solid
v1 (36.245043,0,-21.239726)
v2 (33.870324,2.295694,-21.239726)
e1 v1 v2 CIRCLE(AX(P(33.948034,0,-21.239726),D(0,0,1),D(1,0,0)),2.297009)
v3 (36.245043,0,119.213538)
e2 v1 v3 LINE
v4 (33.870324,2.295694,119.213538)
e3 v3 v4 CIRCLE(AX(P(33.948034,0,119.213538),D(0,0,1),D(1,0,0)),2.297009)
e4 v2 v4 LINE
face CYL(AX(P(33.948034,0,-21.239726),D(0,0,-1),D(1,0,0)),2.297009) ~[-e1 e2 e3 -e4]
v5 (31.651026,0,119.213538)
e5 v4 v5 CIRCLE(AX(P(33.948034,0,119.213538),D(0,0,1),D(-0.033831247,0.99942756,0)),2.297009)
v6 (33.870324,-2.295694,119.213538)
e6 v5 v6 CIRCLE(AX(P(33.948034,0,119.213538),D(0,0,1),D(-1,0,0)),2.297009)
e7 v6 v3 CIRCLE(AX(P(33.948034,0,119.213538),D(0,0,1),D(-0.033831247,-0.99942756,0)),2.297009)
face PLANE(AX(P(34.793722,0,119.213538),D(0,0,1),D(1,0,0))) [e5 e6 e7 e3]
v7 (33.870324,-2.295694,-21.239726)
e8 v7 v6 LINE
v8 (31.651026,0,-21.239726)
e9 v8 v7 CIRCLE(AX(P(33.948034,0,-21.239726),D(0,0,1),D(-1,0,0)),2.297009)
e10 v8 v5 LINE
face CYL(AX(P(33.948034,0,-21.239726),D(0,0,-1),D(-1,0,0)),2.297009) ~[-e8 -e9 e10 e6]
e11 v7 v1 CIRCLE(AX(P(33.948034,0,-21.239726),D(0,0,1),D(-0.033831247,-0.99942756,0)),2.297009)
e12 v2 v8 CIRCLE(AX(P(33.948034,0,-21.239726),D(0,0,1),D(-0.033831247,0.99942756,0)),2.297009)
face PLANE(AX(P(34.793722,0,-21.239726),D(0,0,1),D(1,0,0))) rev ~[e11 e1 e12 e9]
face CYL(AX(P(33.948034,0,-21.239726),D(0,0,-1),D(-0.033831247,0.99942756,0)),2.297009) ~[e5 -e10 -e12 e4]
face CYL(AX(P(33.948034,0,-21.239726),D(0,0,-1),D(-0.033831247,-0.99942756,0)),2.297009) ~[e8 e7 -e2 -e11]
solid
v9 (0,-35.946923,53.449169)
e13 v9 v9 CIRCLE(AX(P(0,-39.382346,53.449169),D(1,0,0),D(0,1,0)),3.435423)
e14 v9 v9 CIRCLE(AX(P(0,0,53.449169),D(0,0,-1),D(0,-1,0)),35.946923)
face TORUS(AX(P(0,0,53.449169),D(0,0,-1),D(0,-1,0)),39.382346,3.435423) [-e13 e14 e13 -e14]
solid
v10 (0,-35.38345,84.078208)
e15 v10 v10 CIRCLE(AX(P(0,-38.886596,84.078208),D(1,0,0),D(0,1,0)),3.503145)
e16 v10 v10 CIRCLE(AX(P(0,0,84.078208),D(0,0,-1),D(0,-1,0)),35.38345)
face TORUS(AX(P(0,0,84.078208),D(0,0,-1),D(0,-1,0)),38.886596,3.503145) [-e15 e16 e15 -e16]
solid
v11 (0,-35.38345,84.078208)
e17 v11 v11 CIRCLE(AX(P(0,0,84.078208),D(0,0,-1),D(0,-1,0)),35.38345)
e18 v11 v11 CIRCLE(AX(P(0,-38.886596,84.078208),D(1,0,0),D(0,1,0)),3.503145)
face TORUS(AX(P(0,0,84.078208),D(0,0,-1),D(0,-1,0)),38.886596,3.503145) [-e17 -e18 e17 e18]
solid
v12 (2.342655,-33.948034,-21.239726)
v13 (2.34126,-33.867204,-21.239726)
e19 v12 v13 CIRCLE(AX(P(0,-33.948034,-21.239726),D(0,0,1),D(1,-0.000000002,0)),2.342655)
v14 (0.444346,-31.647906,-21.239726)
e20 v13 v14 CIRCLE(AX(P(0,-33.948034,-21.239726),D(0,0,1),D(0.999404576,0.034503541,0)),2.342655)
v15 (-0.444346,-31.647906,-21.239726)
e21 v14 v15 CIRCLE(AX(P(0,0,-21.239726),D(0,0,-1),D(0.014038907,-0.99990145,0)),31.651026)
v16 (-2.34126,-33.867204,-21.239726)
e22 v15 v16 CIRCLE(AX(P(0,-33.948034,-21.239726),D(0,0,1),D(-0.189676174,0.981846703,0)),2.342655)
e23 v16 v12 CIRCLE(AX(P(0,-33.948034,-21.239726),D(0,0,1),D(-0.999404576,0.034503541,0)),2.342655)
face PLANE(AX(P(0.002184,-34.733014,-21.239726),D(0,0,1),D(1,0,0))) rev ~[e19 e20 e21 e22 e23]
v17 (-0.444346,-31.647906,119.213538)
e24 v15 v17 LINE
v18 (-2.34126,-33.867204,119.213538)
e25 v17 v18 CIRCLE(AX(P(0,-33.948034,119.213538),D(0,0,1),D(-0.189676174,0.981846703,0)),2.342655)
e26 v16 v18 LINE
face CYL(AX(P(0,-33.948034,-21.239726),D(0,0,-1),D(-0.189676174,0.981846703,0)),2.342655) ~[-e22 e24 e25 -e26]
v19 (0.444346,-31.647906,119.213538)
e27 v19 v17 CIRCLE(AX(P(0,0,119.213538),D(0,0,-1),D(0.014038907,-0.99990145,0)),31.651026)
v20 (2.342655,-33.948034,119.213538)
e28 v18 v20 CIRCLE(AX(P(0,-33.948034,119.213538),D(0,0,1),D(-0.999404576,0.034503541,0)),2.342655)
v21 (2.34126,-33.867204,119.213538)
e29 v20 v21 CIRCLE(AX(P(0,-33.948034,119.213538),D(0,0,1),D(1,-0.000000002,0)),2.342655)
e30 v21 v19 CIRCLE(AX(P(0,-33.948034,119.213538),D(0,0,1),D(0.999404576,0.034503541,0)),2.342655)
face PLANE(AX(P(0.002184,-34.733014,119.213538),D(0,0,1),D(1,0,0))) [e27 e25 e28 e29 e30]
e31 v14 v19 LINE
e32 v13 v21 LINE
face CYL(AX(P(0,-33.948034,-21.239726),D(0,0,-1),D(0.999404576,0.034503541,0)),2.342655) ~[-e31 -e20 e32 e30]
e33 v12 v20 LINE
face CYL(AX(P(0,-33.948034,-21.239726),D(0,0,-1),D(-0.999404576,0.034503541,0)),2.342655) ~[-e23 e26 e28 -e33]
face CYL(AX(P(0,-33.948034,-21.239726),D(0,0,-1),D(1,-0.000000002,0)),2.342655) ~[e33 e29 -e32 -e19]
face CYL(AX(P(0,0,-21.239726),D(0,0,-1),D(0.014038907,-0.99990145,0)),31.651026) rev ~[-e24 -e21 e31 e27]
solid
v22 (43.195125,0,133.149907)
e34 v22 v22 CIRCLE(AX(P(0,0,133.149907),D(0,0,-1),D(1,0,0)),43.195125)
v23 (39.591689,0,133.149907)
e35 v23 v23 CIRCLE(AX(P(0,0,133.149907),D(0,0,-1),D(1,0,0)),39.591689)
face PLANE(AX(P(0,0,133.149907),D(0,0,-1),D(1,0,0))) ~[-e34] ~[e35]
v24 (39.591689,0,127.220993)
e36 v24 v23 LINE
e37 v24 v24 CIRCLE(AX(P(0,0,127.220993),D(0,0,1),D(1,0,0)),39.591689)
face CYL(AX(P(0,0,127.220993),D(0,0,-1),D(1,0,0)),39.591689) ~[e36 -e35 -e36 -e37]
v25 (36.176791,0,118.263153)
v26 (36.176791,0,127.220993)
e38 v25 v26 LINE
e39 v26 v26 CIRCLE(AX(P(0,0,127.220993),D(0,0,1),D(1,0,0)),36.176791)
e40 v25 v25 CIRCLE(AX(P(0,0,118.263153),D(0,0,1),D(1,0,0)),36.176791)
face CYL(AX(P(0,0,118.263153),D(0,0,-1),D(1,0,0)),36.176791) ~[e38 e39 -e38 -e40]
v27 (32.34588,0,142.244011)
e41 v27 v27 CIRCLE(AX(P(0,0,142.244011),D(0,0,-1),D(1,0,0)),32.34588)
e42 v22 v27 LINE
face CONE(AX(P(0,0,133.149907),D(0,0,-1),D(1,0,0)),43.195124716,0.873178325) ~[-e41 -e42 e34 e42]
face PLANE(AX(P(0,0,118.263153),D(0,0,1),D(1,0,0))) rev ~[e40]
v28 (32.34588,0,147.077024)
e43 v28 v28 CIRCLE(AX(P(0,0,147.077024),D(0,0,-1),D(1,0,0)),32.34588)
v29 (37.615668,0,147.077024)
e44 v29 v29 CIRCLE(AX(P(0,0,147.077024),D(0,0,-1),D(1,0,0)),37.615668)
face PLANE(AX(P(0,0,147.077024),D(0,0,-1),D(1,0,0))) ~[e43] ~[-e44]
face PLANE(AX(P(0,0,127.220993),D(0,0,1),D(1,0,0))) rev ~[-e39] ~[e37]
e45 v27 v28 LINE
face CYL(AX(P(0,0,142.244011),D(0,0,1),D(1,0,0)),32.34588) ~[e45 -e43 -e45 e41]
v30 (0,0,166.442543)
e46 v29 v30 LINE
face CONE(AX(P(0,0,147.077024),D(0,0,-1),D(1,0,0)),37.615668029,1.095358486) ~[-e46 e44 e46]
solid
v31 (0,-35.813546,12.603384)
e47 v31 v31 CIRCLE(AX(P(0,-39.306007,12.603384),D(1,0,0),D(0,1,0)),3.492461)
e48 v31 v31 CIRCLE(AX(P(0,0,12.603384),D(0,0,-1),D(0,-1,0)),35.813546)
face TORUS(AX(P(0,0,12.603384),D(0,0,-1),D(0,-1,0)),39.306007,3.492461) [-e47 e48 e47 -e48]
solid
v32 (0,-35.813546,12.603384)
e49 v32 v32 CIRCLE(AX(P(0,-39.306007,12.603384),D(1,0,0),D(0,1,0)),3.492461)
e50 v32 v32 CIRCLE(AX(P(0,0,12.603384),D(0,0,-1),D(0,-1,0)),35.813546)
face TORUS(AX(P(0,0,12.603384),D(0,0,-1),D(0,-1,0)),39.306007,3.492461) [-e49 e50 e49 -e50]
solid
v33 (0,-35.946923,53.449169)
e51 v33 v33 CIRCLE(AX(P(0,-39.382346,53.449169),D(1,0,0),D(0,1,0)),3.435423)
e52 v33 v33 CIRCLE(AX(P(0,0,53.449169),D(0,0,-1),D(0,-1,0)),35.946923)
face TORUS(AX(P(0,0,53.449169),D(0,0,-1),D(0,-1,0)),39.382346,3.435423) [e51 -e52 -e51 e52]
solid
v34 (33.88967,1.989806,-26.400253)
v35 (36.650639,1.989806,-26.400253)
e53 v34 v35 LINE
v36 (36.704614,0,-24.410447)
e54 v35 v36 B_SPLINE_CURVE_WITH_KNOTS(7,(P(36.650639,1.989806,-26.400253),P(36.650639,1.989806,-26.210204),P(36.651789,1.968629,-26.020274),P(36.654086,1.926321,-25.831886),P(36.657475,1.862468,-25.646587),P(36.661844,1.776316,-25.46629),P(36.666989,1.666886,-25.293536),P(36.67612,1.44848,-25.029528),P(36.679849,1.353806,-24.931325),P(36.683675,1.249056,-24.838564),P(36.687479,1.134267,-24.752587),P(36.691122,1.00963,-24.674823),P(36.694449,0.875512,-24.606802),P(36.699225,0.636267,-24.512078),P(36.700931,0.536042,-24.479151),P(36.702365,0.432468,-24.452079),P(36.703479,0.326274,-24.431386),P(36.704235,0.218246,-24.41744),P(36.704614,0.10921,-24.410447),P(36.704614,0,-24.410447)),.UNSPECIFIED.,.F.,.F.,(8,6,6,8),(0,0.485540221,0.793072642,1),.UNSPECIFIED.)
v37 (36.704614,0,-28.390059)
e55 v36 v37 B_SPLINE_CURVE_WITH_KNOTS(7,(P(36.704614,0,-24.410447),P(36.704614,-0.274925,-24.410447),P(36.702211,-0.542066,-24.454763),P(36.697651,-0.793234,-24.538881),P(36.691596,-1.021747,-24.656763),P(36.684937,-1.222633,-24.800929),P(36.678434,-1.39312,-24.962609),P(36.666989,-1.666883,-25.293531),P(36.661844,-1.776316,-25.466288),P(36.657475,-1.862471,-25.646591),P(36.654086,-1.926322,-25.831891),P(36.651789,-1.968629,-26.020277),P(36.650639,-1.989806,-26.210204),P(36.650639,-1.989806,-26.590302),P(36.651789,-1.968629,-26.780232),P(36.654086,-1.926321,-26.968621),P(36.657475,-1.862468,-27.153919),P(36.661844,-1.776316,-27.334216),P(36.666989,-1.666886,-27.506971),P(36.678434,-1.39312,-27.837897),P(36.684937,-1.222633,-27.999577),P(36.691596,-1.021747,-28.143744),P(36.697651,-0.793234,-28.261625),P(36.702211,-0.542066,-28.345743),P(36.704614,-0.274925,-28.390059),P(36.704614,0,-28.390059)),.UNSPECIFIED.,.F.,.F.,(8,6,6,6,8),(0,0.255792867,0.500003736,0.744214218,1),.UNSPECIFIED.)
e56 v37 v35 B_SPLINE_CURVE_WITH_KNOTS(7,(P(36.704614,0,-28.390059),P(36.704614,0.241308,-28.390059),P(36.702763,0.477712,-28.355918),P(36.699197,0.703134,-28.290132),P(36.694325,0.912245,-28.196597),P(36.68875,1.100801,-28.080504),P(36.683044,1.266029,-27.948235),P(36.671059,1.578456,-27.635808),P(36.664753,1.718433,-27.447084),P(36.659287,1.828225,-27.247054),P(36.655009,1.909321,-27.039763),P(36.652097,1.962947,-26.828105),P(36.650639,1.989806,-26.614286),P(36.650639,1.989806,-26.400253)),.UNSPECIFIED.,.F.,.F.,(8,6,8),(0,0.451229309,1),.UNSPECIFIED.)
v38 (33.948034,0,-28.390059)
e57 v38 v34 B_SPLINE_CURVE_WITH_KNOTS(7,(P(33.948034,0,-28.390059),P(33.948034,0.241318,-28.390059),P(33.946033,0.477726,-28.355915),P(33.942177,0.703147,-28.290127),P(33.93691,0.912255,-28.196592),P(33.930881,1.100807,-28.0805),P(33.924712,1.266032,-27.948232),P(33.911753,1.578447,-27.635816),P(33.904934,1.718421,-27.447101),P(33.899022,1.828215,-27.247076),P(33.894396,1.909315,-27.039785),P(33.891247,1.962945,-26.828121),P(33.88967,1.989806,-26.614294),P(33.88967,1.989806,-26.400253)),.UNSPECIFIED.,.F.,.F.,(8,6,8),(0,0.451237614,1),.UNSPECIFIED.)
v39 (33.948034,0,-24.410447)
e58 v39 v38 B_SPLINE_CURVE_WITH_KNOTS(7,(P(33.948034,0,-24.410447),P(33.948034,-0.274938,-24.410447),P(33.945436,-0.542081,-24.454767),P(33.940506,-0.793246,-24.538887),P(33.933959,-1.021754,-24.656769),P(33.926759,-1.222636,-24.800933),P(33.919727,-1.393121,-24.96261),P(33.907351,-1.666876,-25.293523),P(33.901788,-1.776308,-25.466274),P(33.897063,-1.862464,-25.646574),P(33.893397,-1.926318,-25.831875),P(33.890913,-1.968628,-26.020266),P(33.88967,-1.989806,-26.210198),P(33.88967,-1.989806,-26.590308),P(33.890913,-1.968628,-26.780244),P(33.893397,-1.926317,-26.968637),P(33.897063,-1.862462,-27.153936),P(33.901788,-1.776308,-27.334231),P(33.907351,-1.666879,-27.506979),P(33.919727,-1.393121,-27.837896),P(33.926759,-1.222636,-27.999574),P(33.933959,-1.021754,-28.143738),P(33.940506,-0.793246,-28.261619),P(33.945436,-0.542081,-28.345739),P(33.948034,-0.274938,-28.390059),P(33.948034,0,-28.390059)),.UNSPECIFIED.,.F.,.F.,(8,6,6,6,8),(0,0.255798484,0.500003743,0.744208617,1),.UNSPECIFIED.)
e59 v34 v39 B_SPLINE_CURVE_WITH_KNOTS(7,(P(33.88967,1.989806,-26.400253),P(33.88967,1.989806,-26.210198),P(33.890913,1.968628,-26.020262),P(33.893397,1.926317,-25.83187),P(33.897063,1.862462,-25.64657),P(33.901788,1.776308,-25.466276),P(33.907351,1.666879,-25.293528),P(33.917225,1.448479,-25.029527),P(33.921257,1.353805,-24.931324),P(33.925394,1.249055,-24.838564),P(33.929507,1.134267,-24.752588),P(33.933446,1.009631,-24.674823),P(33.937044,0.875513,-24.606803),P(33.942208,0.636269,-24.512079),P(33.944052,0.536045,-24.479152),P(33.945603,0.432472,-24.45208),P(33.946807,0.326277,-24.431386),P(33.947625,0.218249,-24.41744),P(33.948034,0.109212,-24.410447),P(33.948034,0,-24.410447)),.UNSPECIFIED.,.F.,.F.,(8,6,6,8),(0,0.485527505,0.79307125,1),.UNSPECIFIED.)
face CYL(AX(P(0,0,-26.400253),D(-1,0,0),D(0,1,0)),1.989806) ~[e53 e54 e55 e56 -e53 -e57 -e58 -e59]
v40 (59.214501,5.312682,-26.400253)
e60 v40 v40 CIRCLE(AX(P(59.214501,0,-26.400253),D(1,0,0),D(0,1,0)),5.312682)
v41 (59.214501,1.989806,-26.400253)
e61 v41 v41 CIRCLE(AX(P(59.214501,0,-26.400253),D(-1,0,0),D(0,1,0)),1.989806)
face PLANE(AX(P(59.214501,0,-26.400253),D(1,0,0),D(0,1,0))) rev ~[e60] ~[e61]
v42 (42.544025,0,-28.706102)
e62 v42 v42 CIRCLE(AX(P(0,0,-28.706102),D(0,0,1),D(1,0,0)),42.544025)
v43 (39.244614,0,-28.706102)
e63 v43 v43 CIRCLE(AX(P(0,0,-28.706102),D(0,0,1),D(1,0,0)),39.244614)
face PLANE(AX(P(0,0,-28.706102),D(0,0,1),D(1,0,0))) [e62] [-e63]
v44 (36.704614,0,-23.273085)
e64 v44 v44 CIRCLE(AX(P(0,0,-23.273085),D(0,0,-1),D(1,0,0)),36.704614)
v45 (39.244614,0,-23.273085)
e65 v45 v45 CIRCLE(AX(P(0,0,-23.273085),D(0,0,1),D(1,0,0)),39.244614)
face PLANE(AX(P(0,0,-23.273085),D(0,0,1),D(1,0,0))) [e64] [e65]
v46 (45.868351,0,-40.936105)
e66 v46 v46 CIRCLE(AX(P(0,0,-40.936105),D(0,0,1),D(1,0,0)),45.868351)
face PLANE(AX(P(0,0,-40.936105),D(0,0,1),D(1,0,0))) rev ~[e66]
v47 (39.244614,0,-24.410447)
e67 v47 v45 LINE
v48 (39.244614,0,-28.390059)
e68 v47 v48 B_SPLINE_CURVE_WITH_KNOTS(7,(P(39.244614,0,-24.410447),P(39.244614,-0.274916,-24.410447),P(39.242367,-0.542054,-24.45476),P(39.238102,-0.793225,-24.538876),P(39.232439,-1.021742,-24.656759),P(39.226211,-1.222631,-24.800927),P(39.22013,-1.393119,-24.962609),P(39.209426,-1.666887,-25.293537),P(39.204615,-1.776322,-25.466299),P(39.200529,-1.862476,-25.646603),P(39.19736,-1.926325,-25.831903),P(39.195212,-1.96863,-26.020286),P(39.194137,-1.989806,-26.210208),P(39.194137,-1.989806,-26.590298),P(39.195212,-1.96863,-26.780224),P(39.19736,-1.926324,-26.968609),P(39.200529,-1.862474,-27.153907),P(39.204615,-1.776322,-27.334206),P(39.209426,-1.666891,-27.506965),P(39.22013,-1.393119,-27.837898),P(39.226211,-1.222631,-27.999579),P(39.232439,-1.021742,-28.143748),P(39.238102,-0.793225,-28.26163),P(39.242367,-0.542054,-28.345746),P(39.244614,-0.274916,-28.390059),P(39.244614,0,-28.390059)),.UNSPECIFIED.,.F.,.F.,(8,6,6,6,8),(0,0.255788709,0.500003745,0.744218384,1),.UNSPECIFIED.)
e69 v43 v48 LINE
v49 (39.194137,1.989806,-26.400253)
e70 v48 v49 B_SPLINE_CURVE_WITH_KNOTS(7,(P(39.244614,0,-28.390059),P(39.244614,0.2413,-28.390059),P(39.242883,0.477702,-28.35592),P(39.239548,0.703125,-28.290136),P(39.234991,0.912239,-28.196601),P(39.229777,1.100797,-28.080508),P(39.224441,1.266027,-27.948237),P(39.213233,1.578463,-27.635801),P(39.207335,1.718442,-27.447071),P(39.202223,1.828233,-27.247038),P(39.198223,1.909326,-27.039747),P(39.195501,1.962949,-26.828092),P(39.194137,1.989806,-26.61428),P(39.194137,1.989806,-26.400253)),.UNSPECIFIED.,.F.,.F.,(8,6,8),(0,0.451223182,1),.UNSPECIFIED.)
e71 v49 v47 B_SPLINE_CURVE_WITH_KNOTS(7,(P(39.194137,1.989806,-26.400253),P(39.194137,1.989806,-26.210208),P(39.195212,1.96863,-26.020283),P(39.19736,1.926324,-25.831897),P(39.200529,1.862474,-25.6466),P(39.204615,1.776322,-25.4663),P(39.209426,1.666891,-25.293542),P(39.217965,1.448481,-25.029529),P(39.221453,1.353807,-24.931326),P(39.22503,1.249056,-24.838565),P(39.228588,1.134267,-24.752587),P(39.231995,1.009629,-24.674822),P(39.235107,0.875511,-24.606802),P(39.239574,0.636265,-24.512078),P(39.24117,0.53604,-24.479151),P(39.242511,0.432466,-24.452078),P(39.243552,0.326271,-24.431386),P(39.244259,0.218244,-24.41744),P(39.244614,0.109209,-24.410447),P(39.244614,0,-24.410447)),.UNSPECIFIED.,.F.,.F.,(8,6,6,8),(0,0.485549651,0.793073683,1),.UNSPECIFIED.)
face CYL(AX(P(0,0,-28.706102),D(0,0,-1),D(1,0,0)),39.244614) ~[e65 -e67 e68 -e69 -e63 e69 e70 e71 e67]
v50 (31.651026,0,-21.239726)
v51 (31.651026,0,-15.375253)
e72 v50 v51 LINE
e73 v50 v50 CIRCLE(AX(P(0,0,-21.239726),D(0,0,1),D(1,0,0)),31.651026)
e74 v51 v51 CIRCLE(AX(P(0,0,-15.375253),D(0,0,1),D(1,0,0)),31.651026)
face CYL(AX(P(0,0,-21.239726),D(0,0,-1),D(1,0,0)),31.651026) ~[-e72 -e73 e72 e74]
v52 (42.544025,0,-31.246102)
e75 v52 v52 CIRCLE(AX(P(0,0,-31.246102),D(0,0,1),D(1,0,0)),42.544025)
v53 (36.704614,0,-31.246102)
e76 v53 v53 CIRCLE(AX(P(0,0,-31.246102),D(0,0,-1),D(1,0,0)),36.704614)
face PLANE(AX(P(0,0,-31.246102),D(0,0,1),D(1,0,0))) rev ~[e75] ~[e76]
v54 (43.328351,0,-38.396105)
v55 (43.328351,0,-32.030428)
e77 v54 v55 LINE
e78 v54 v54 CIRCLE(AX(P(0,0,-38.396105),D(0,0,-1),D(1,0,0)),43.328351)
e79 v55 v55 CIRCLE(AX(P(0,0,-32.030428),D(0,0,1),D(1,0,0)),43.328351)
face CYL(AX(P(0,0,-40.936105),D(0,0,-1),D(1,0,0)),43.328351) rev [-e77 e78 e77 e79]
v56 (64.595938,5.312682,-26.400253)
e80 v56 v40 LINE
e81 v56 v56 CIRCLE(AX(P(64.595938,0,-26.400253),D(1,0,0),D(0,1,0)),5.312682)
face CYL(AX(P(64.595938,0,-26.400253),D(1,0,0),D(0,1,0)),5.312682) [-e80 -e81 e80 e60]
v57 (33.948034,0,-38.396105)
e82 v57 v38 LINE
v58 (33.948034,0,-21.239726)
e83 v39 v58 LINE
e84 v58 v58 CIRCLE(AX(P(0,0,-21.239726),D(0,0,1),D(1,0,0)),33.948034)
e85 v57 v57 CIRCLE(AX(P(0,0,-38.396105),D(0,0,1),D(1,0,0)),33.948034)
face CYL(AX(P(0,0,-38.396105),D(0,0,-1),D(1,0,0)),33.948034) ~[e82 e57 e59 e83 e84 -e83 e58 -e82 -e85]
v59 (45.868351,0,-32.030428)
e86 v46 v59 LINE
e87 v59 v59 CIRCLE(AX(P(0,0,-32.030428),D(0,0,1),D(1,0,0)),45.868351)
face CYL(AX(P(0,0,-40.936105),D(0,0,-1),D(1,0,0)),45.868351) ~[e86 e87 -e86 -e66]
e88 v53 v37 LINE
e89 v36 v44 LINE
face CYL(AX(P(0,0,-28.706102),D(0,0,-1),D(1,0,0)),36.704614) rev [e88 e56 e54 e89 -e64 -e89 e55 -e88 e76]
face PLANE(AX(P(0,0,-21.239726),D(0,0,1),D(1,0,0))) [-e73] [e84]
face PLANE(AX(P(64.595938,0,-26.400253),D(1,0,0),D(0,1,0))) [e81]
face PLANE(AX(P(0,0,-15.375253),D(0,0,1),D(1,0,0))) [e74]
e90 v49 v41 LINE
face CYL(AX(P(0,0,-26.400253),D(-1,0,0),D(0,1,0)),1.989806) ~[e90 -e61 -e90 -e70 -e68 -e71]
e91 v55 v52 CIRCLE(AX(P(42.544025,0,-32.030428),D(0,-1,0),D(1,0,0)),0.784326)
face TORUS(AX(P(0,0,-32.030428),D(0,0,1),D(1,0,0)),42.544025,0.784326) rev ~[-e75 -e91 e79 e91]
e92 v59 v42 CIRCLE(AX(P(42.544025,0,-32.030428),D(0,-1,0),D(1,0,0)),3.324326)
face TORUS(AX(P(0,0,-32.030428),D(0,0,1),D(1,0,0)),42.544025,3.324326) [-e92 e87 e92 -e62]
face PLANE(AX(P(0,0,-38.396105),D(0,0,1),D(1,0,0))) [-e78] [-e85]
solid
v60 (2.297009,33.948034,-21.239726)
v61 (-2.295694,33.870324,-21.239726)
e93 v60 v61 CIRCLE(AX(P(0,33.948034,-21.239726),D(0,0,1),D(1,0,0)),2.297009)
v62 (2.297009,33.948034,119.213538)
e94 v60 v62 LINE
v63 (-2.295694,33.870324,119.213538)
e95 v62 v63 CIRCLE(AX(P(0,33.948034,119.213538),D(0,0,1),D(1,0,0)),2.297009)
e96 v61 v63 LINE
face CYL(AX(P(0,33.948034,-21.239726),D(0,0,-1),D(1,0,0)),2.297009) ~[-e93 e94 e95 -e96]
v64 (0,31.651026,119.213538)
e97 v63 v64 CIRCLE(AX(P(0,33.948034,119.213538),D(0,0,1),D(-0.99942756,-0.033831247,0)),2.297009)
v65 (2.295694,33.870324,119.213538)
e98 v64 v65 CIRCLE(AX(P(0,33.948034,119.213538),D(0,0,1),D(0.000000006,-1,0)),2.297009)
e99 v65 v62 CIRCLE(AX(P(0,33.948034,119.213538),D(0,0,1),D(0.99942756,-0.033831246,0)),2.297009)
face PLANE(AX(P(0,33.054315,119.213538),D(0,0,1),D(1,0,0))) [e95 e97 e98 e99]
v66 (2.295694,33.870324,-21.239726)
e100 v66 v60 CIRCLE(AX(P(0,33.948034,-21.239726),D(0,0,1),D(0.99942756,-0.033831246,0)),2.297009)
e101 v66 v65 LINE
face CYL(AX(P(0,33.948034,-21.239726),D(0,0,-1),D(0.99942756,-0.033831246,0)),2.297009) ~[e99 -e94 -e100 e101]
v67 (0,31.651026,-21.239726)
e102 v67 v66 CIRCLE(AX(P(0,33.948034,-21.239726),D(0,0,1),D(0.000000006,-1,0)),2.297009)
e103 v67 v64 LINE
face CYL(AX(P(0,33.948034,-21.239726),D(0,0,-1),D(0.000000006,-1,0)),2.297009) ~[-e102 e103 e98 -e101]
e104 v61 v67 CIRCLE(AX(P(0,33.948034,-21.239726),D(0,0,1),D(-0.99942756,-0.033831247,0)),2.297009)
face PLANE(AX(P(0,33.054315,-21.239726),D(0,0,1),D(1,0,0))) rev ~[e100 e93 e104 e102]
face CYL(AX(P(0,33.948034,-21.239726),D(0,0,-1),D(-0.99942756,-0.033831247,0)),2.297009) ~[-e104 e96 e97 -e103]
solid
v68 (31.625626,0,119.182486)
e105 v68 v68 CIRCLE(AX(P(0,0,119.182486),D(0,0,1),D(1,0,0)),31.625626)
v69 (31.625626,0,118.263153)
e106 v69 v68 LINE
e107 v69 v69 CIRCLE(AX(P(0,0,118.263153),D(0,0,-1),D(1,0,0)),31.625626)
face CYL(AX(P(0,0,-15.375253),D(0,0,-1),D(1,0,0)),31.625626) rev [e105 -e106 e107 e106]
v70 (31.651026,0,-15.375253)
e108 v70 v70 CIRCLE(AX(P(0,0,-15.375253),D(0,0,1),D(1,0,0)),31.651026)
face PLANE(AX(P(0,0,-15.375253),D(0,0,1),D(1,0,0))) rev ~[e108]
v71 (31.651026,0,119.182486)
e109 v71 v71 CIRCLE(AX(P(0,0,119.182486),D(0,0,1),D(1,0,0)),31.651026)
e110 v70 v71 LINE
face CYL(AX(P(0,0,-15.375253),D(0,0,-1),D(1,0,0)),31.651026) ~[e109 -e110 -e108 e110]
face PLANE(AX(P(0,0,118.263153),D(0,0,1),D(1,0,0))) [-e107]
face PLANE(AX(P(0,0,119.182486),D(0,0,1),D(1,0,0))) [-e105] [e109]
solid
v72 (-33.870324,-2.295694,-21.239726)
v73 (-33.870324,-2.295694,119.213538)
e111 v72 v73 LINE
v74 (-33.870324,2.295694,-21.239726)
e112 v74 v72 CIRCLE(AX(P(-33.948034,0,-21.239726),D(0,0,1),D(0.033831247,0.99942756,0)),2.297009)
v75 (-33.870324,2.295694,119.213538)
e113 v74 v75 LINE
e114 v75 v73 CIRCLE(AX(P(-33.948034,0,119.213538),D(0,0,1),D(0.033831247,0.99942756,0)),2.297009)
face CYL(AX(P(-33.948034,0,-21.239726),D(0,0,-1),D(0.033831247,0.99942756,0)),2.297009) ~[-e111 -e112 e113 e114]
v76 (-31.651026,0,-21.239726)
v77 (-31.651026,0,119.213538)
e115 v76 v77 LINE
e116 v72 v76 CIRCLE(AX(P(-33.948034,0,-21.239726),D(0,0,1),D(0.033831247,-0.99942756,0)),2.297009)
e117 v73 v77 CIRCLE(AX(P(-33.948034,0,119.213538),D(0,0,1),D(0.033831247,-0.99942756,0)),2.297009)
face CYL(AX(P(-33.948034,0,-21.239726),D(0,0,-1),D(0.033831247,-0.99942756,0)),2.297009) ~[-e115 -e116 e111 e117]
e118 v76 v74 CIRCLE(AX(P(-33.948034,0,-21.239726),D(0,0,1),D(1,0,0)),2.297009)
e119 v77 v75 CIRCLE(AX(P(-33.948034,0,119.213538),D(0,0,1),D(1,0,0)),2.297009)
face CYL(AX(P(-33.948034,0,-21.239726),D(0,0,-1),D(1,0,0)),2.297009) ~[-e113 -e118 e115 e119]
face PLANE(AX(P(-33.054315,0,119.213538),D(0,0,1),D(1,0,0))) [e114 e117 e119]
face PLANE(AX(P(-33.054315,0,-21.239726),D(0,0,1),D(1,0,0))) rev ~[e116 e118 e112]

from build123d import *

# Parameters (mm, degrees)
F2_R      = 45.8683508663
F3_DEPTH  = 12.2300032526
F4_R      = 3.3243260017
F5_R      = 39.2446138712
F6_DEPTH  = 5.4330164567
F7_T      = -2.54
F8_R      = 33.9480342633
F9_DEPTH  = 17.1563792974
F10_R     = 31.6510256054
F11_DEPTH = 5.8644730598
F13_DEPTH = 140.4532641172
F14_DEPTH = 134.5577389002
F15_T     = -0.0254
F16_DEPTH = 133.6130052805
F17_R     = 36.1767908596
F18_DEPTH = 8.9578405023
F19_R     = 39.5916894085
F19_R_2   = 36.1767908596
F20_DEPTH = 6.1409324408
F23_R     = 5.3493148044
F24_DEPTH = 28.7772919983
F27_R     = 3.4354229328
F27_R_2   = 3.4924611579
F27_R_3   = 3.5031451318
F31_R     = 1.9898060625
F32_DEPTH = 64.5959377289
F33_R     = 5.3126821934
F33_R_2   = 1.9898060625
F34_DEPTH = 5.3814365529


# Not quite as in the source:
# - the program builds the solid bodies; features that only make, move or delete a surface that nothing else refers to are left out


with BuildPart() as f3:
    # F2 (on face) → F3 (new body)
    with BuildSketch(Plane.XY.offset(-40.9361049533)):
        Circle(F2_R)
    extrude(amount=F3_DEPTH)

    # F4
    f4_edges = [f3.edges().sort_by_distance(p)[0] for p in [
        (-45.868351, 0, -28.706102),
    ]]
    fillet(f4_edges, radius=F4_R)

    # F5 (on face) → F6 (join)
    with BuildSketch(Plane.XY.offset(-28.7061017007)):
        Circle(F5_R)
    extrude(amount=F6_DEPTH)

    # F7
    f7_openings = [f3.faces().sort_by_distance(p)[0] for p in [
        (0, 0, -23.273085),
    ]]
    offset(amount=F7_T, openings=f7_openings, kind=Kind.INTERSECTION)

    # F8 (on face) → F9 (join)
    with BuildSketch(Plane.XY.offset(-38.3961049533)):
        Circle(F8_R)
    extrude(amount=F9_DEPTH)

    # F10 (on face) → F11 (join)
    with BuildSketch(Plane.XY.offset(-21.2397256559)):
        Circle(F10_R)
    extrude(amount=F11_DEPTH)


with BuildPart() as f13:
    # F12 (on face) → F13 (new body)
    with BuildSketch(Plane.XY.offset(-21.2397256559)):
        with BuildLine():
            ThreePointArc((33.8703235962, -2.2956937572), (35.5445533987, -1.6514767406), (36.2450429212, 0))
            ThreePointArc((36.2450429212, 0), (35.5445533987, 1.6514767406), (33.8703235962, 2.2956937572))
            ThreePointArc((33.8703235962, 2.2956937572), (33.9286010343, 1.1485043289), (33.9480342633, 0))
            ThreePointArc((33.9480342633, 0), (33.9286010343, -1.1485043289), (33.8703235962, -2.2956937572))
        make_face()
        with BuildLine():
            ThreePointArc((33.9480342633, 0), (33.9286010343, 1.1485043289), (33.8703235962, 2.2956937572))
            ThreePointArc((33.8703235962, 2.2956937572), (32.2965575227, 1.5965191354), (31.6510256054, 0))
            ThreePointArc((31.6510256054, 0), (32.2965575227, -1.5965191354), (33.8703235962, -2.2956937572))
            ThreePointArc((33.8703235962, -2.2956937572), (33.9286010343, -1.1485043289), (33.9480342633, 0))
        make_face()
    extrude(amount=F13_DEPTH)


with BuildPart() as f13b:
    # F12 (on face) → F13, piece 2 (new body)
    with BuildSketch(Plane.XY.offset(-21.2397256559)):
        with BuildLine():
            ThreePointArc((-33.8703235962, -2.2956937572), (-32.2965575227, -1.5965191354), (-31.6510256054, 0))
            ThreePointArc((-31.6510256054, 0), (-32.2965575227, 1.5965191354), (-33.8703235962, 2.2956937572))
            ThreePointArc((-33.8703235962, 2.2956937572), (-33.9480342633, 0), (-33.8703235962, -2.2956937572))
        make_face()
        with BuildLine():
            ThreePointArc((-33.8703235962, -2.2956937572), (-33.9480342633, 0), (-33.8703235962, 2.2956937572))
            ThreePointArc((-33.8703235962, 2.2956937572), (-36.2450429212, 0), (-33.8703235962, -2.2956937572))
        make_face()
    extrude(amount=F13_DEPTH)


with BuildPart() as f13c:
    # F12 (on face) → F13, piece 3 (new body)
    with BuildSketch(Plane.XY.offset(-21.2397256559)):
        with BuildLine():
            ThreePointArc((1.28e-08, 31.6510256054), (1.59651914, 32.2965575272), (2.2956937572, 33.8703235962))
            ThreePointArc((2.2956937572, 33.8703235962), (0, 33.9480342633), (-2.2956937572, 33.8703235962))
            ThreePointArc((-2.2956937572, 33.8703235962), (-1.5965191308, 32.2965575182), (1.28e-08, 31.6510256054))
        make_face()
        with BuildLine():
            ThreePointArc((-2.2956937572, 33.8703235962), (0, 33.9480342633), (2.2956937572, 33.8703235962))
            ThreePointArc((2.2956937572, 33.8703235962), (2.2966799092, 33.909173368), (2.2970086579, 33.9480342633))
            ThreePointArc((2.2970086579, 33.9480342633), (-0.0388608953, 36.2447141725), (-2.2956937572, 33.8703235962))
        make_face()
    extrude(amount=F13_DEPTH)


with BuildPart() as f13d:
    # F12 (on face) → F13, piece 4 (new body)
    with BuildSketch(Plane.XY.offset(-21.2397256559)):
        with BuildLine():
            ThreePointArc((2.3426547832, -33.9480342633), (2.3423060388, -33.9076133033), (2.3412599093, -33.867204378))
            ThreePointArc((2.3412599093, -33.867204378), (0, -33.9480342633), (-2.3412599093, -33.867204378))
            ThreePointArc((-2.3412599093, -33.867204378), (-0.04042096, -36.2903403021), (2.3426547832, -33.9480342633))
        make_face()
        with BuildLine():
            ThreePointArc((-2.3412599093, -33.867204378), (0, -33.9480342633), (2.3412599093, -33.867204378))
            ThreePointArc((2.3412599093, -33.867204378), (1.7807921495, -32.4259269235), (0.4443457961, -31.6479063871))
            ThreePointArc((0.4443457961, -31.6479063871), (0, -31.6510256054), (-0.4443457961, -31.6479063871))
            ThreePointArc((-0.4443457961, -31.6479063871), (-1.7807921495, -32.4259269235), (-2.3412599093, -33.867204378))
        make_face()
    extrude(amount=F13_DEPTH)


with BuildPart() as f14:
    # F14 (new): a face of the model
    f14_faces = [f3.part.faces().sort_by_distance(p)[0] for p in [
        (0, 0, -15.3752525961),
    ]]
    extrude(f14_faces, amount=F14_DEPTH)

    # F15
    f15_openings = [f14.faces().sort_by_distance(p)[0] for p in [
        (0, 0, 119.182486),
    ]]
    offset(amount=F15_T, openings=f15_openings)

    # F16 (add): a face of the model
    f16_faces = [f14.faces().sort_by_distance(p)[0] for p in [
        (0, 0, -15.3498525961),
    ]]
    extrude(f16_faces, amount=F16_DEPTH)


with BuildPart() as f18:
    # F17 (on face) → F18 (new body)
    with BuildSketch(Plane.XY.offset(118.2631526844)):
        Circle(F17_R)
    extrude(amount=F18_DEPTH)

    # F19 (on face) → F20 (join)
    with BuildSketch(Plane.XY.offset(127.2209931866)):
        Circle(F19_R)
        Circle(F19_R_2, mode=Mode.SUBTRACT)
        Circle(F19_R_2)
    extrude(amount=F20_DEPTH)

    # F23 (on face) → F24 (join)
    with BuildSketch(Plane.XY.offset(133.3619256274)):
        Circle(F23_R)
    extrude(amount=F24_DEPTH)

    # F25 (on Front) → F26 (revolve)
    with BuildSketch(Plane.XZ):
        Polygon((0, 166.4425432682), (0, 148.0017155409), (0, 133.1499069929), (43.1951247156, 133.1499069929), (32.345879823, 142.2440111637), (32.345879823, 147.077023983), (37.6156680286, 147.077023983), align=None)
    revolve(axis=Axis((0, 0, 157.2221294045), (0, 0, -1)))


with BuildPart() as f29:
    # F27 (on Right) → F29 (revolve)
    with BuildSketch(Plane.YZ):
        with Locations((-39.3823459744, 53.4491688013)):
            Circle(F27_R)
    revolve(axis=Axis((0, 0, -15.3752525961), (0, 0, -1)))


with BuildPart() as f29b:
    # F27 (on Right) → F29, piece 2 (revolve)
    with BuildSketch(Plane.YZ):
        with Locations((-39.3060073256, 12.6033835113)):
            Circle(F27_R_2)
    revolve(axis=Axis((0, 0, -15.3752525961), (0, 0, -1)))


with BuildPart() as f29c:
    # F27 (on Right) → F29, piece 3 (revolve)
    with BuildSketch(Plane.YZ):
        with Locations((-38.8865955174, 84.078207612)):
            Circle(F27_R_3)
    revolve(axis=Axis((0, 0, -15.3752525961), (0, 0, -1)))


with BuildPart() as f30:
    # F27 (on Right) → F30 (revolve)
    with BuildSketch(Plane.YZ):
        with Locations((-39.3823459744, 53.4491688013)):
            Circle(F27_R)
    revolve(axis=Axis((0, 0, -15.3752525961), (0, 0, -1)))


with BuildPart() as f30b:
    # F27 (on Right) → F30, piece 2 (revolve)
    with BuildSketch(Plane.YZ):
        with Locations((-39.3060073256, 12.6033835113)):
            Circle(F27_R_2)
    revolve(axis=Axis((0, 0, -15.3752525961), (0, 0, -1)))


with BuildPart() as f30c:
    # F27 (on Right) → F30, piece 3 (revolve)
    with BuildSketch(Plane.YZ):
        with Locations((-38.8865955174, 84.078207612)):
            Circle(F27_R_3)
    revolve(axis=Axis((0, 0, -15.3752525961), (0, 0, -1)))


with BuildPart() as f3_1:
    add(f3.part)

    # F31 (on Right) → F32 (join)
    with BuildSketch(Plane.YZ):
        with Locations((0, -26.4002531767)):
            Circle(F31_R)
    extrude(amount=F32_DEPTH)

    # F33 (on face) → F34 (join)
    with BuildSketch(Plane.YZ.offset(64.5959377289)):
        with Locations((0, -26.4002531767)):
            Circle(F33_R)
        with Locations((0, -26.4002531767)):
            Circle(F33_R_2, mode=Mode.SUBTRACT)
        with Locations((0, -26.4002531767)):
            Circle(F33_R_2)
    extrude(amount=-F34_DEPTH)


solid = Compound([f13.part, f13b.part, f13c.part, f13d.part, f14.part, f18.part, f29.part, f29b.part, f29c.part, f30.part, f30b.part, f30c.part, f3_1.part])
